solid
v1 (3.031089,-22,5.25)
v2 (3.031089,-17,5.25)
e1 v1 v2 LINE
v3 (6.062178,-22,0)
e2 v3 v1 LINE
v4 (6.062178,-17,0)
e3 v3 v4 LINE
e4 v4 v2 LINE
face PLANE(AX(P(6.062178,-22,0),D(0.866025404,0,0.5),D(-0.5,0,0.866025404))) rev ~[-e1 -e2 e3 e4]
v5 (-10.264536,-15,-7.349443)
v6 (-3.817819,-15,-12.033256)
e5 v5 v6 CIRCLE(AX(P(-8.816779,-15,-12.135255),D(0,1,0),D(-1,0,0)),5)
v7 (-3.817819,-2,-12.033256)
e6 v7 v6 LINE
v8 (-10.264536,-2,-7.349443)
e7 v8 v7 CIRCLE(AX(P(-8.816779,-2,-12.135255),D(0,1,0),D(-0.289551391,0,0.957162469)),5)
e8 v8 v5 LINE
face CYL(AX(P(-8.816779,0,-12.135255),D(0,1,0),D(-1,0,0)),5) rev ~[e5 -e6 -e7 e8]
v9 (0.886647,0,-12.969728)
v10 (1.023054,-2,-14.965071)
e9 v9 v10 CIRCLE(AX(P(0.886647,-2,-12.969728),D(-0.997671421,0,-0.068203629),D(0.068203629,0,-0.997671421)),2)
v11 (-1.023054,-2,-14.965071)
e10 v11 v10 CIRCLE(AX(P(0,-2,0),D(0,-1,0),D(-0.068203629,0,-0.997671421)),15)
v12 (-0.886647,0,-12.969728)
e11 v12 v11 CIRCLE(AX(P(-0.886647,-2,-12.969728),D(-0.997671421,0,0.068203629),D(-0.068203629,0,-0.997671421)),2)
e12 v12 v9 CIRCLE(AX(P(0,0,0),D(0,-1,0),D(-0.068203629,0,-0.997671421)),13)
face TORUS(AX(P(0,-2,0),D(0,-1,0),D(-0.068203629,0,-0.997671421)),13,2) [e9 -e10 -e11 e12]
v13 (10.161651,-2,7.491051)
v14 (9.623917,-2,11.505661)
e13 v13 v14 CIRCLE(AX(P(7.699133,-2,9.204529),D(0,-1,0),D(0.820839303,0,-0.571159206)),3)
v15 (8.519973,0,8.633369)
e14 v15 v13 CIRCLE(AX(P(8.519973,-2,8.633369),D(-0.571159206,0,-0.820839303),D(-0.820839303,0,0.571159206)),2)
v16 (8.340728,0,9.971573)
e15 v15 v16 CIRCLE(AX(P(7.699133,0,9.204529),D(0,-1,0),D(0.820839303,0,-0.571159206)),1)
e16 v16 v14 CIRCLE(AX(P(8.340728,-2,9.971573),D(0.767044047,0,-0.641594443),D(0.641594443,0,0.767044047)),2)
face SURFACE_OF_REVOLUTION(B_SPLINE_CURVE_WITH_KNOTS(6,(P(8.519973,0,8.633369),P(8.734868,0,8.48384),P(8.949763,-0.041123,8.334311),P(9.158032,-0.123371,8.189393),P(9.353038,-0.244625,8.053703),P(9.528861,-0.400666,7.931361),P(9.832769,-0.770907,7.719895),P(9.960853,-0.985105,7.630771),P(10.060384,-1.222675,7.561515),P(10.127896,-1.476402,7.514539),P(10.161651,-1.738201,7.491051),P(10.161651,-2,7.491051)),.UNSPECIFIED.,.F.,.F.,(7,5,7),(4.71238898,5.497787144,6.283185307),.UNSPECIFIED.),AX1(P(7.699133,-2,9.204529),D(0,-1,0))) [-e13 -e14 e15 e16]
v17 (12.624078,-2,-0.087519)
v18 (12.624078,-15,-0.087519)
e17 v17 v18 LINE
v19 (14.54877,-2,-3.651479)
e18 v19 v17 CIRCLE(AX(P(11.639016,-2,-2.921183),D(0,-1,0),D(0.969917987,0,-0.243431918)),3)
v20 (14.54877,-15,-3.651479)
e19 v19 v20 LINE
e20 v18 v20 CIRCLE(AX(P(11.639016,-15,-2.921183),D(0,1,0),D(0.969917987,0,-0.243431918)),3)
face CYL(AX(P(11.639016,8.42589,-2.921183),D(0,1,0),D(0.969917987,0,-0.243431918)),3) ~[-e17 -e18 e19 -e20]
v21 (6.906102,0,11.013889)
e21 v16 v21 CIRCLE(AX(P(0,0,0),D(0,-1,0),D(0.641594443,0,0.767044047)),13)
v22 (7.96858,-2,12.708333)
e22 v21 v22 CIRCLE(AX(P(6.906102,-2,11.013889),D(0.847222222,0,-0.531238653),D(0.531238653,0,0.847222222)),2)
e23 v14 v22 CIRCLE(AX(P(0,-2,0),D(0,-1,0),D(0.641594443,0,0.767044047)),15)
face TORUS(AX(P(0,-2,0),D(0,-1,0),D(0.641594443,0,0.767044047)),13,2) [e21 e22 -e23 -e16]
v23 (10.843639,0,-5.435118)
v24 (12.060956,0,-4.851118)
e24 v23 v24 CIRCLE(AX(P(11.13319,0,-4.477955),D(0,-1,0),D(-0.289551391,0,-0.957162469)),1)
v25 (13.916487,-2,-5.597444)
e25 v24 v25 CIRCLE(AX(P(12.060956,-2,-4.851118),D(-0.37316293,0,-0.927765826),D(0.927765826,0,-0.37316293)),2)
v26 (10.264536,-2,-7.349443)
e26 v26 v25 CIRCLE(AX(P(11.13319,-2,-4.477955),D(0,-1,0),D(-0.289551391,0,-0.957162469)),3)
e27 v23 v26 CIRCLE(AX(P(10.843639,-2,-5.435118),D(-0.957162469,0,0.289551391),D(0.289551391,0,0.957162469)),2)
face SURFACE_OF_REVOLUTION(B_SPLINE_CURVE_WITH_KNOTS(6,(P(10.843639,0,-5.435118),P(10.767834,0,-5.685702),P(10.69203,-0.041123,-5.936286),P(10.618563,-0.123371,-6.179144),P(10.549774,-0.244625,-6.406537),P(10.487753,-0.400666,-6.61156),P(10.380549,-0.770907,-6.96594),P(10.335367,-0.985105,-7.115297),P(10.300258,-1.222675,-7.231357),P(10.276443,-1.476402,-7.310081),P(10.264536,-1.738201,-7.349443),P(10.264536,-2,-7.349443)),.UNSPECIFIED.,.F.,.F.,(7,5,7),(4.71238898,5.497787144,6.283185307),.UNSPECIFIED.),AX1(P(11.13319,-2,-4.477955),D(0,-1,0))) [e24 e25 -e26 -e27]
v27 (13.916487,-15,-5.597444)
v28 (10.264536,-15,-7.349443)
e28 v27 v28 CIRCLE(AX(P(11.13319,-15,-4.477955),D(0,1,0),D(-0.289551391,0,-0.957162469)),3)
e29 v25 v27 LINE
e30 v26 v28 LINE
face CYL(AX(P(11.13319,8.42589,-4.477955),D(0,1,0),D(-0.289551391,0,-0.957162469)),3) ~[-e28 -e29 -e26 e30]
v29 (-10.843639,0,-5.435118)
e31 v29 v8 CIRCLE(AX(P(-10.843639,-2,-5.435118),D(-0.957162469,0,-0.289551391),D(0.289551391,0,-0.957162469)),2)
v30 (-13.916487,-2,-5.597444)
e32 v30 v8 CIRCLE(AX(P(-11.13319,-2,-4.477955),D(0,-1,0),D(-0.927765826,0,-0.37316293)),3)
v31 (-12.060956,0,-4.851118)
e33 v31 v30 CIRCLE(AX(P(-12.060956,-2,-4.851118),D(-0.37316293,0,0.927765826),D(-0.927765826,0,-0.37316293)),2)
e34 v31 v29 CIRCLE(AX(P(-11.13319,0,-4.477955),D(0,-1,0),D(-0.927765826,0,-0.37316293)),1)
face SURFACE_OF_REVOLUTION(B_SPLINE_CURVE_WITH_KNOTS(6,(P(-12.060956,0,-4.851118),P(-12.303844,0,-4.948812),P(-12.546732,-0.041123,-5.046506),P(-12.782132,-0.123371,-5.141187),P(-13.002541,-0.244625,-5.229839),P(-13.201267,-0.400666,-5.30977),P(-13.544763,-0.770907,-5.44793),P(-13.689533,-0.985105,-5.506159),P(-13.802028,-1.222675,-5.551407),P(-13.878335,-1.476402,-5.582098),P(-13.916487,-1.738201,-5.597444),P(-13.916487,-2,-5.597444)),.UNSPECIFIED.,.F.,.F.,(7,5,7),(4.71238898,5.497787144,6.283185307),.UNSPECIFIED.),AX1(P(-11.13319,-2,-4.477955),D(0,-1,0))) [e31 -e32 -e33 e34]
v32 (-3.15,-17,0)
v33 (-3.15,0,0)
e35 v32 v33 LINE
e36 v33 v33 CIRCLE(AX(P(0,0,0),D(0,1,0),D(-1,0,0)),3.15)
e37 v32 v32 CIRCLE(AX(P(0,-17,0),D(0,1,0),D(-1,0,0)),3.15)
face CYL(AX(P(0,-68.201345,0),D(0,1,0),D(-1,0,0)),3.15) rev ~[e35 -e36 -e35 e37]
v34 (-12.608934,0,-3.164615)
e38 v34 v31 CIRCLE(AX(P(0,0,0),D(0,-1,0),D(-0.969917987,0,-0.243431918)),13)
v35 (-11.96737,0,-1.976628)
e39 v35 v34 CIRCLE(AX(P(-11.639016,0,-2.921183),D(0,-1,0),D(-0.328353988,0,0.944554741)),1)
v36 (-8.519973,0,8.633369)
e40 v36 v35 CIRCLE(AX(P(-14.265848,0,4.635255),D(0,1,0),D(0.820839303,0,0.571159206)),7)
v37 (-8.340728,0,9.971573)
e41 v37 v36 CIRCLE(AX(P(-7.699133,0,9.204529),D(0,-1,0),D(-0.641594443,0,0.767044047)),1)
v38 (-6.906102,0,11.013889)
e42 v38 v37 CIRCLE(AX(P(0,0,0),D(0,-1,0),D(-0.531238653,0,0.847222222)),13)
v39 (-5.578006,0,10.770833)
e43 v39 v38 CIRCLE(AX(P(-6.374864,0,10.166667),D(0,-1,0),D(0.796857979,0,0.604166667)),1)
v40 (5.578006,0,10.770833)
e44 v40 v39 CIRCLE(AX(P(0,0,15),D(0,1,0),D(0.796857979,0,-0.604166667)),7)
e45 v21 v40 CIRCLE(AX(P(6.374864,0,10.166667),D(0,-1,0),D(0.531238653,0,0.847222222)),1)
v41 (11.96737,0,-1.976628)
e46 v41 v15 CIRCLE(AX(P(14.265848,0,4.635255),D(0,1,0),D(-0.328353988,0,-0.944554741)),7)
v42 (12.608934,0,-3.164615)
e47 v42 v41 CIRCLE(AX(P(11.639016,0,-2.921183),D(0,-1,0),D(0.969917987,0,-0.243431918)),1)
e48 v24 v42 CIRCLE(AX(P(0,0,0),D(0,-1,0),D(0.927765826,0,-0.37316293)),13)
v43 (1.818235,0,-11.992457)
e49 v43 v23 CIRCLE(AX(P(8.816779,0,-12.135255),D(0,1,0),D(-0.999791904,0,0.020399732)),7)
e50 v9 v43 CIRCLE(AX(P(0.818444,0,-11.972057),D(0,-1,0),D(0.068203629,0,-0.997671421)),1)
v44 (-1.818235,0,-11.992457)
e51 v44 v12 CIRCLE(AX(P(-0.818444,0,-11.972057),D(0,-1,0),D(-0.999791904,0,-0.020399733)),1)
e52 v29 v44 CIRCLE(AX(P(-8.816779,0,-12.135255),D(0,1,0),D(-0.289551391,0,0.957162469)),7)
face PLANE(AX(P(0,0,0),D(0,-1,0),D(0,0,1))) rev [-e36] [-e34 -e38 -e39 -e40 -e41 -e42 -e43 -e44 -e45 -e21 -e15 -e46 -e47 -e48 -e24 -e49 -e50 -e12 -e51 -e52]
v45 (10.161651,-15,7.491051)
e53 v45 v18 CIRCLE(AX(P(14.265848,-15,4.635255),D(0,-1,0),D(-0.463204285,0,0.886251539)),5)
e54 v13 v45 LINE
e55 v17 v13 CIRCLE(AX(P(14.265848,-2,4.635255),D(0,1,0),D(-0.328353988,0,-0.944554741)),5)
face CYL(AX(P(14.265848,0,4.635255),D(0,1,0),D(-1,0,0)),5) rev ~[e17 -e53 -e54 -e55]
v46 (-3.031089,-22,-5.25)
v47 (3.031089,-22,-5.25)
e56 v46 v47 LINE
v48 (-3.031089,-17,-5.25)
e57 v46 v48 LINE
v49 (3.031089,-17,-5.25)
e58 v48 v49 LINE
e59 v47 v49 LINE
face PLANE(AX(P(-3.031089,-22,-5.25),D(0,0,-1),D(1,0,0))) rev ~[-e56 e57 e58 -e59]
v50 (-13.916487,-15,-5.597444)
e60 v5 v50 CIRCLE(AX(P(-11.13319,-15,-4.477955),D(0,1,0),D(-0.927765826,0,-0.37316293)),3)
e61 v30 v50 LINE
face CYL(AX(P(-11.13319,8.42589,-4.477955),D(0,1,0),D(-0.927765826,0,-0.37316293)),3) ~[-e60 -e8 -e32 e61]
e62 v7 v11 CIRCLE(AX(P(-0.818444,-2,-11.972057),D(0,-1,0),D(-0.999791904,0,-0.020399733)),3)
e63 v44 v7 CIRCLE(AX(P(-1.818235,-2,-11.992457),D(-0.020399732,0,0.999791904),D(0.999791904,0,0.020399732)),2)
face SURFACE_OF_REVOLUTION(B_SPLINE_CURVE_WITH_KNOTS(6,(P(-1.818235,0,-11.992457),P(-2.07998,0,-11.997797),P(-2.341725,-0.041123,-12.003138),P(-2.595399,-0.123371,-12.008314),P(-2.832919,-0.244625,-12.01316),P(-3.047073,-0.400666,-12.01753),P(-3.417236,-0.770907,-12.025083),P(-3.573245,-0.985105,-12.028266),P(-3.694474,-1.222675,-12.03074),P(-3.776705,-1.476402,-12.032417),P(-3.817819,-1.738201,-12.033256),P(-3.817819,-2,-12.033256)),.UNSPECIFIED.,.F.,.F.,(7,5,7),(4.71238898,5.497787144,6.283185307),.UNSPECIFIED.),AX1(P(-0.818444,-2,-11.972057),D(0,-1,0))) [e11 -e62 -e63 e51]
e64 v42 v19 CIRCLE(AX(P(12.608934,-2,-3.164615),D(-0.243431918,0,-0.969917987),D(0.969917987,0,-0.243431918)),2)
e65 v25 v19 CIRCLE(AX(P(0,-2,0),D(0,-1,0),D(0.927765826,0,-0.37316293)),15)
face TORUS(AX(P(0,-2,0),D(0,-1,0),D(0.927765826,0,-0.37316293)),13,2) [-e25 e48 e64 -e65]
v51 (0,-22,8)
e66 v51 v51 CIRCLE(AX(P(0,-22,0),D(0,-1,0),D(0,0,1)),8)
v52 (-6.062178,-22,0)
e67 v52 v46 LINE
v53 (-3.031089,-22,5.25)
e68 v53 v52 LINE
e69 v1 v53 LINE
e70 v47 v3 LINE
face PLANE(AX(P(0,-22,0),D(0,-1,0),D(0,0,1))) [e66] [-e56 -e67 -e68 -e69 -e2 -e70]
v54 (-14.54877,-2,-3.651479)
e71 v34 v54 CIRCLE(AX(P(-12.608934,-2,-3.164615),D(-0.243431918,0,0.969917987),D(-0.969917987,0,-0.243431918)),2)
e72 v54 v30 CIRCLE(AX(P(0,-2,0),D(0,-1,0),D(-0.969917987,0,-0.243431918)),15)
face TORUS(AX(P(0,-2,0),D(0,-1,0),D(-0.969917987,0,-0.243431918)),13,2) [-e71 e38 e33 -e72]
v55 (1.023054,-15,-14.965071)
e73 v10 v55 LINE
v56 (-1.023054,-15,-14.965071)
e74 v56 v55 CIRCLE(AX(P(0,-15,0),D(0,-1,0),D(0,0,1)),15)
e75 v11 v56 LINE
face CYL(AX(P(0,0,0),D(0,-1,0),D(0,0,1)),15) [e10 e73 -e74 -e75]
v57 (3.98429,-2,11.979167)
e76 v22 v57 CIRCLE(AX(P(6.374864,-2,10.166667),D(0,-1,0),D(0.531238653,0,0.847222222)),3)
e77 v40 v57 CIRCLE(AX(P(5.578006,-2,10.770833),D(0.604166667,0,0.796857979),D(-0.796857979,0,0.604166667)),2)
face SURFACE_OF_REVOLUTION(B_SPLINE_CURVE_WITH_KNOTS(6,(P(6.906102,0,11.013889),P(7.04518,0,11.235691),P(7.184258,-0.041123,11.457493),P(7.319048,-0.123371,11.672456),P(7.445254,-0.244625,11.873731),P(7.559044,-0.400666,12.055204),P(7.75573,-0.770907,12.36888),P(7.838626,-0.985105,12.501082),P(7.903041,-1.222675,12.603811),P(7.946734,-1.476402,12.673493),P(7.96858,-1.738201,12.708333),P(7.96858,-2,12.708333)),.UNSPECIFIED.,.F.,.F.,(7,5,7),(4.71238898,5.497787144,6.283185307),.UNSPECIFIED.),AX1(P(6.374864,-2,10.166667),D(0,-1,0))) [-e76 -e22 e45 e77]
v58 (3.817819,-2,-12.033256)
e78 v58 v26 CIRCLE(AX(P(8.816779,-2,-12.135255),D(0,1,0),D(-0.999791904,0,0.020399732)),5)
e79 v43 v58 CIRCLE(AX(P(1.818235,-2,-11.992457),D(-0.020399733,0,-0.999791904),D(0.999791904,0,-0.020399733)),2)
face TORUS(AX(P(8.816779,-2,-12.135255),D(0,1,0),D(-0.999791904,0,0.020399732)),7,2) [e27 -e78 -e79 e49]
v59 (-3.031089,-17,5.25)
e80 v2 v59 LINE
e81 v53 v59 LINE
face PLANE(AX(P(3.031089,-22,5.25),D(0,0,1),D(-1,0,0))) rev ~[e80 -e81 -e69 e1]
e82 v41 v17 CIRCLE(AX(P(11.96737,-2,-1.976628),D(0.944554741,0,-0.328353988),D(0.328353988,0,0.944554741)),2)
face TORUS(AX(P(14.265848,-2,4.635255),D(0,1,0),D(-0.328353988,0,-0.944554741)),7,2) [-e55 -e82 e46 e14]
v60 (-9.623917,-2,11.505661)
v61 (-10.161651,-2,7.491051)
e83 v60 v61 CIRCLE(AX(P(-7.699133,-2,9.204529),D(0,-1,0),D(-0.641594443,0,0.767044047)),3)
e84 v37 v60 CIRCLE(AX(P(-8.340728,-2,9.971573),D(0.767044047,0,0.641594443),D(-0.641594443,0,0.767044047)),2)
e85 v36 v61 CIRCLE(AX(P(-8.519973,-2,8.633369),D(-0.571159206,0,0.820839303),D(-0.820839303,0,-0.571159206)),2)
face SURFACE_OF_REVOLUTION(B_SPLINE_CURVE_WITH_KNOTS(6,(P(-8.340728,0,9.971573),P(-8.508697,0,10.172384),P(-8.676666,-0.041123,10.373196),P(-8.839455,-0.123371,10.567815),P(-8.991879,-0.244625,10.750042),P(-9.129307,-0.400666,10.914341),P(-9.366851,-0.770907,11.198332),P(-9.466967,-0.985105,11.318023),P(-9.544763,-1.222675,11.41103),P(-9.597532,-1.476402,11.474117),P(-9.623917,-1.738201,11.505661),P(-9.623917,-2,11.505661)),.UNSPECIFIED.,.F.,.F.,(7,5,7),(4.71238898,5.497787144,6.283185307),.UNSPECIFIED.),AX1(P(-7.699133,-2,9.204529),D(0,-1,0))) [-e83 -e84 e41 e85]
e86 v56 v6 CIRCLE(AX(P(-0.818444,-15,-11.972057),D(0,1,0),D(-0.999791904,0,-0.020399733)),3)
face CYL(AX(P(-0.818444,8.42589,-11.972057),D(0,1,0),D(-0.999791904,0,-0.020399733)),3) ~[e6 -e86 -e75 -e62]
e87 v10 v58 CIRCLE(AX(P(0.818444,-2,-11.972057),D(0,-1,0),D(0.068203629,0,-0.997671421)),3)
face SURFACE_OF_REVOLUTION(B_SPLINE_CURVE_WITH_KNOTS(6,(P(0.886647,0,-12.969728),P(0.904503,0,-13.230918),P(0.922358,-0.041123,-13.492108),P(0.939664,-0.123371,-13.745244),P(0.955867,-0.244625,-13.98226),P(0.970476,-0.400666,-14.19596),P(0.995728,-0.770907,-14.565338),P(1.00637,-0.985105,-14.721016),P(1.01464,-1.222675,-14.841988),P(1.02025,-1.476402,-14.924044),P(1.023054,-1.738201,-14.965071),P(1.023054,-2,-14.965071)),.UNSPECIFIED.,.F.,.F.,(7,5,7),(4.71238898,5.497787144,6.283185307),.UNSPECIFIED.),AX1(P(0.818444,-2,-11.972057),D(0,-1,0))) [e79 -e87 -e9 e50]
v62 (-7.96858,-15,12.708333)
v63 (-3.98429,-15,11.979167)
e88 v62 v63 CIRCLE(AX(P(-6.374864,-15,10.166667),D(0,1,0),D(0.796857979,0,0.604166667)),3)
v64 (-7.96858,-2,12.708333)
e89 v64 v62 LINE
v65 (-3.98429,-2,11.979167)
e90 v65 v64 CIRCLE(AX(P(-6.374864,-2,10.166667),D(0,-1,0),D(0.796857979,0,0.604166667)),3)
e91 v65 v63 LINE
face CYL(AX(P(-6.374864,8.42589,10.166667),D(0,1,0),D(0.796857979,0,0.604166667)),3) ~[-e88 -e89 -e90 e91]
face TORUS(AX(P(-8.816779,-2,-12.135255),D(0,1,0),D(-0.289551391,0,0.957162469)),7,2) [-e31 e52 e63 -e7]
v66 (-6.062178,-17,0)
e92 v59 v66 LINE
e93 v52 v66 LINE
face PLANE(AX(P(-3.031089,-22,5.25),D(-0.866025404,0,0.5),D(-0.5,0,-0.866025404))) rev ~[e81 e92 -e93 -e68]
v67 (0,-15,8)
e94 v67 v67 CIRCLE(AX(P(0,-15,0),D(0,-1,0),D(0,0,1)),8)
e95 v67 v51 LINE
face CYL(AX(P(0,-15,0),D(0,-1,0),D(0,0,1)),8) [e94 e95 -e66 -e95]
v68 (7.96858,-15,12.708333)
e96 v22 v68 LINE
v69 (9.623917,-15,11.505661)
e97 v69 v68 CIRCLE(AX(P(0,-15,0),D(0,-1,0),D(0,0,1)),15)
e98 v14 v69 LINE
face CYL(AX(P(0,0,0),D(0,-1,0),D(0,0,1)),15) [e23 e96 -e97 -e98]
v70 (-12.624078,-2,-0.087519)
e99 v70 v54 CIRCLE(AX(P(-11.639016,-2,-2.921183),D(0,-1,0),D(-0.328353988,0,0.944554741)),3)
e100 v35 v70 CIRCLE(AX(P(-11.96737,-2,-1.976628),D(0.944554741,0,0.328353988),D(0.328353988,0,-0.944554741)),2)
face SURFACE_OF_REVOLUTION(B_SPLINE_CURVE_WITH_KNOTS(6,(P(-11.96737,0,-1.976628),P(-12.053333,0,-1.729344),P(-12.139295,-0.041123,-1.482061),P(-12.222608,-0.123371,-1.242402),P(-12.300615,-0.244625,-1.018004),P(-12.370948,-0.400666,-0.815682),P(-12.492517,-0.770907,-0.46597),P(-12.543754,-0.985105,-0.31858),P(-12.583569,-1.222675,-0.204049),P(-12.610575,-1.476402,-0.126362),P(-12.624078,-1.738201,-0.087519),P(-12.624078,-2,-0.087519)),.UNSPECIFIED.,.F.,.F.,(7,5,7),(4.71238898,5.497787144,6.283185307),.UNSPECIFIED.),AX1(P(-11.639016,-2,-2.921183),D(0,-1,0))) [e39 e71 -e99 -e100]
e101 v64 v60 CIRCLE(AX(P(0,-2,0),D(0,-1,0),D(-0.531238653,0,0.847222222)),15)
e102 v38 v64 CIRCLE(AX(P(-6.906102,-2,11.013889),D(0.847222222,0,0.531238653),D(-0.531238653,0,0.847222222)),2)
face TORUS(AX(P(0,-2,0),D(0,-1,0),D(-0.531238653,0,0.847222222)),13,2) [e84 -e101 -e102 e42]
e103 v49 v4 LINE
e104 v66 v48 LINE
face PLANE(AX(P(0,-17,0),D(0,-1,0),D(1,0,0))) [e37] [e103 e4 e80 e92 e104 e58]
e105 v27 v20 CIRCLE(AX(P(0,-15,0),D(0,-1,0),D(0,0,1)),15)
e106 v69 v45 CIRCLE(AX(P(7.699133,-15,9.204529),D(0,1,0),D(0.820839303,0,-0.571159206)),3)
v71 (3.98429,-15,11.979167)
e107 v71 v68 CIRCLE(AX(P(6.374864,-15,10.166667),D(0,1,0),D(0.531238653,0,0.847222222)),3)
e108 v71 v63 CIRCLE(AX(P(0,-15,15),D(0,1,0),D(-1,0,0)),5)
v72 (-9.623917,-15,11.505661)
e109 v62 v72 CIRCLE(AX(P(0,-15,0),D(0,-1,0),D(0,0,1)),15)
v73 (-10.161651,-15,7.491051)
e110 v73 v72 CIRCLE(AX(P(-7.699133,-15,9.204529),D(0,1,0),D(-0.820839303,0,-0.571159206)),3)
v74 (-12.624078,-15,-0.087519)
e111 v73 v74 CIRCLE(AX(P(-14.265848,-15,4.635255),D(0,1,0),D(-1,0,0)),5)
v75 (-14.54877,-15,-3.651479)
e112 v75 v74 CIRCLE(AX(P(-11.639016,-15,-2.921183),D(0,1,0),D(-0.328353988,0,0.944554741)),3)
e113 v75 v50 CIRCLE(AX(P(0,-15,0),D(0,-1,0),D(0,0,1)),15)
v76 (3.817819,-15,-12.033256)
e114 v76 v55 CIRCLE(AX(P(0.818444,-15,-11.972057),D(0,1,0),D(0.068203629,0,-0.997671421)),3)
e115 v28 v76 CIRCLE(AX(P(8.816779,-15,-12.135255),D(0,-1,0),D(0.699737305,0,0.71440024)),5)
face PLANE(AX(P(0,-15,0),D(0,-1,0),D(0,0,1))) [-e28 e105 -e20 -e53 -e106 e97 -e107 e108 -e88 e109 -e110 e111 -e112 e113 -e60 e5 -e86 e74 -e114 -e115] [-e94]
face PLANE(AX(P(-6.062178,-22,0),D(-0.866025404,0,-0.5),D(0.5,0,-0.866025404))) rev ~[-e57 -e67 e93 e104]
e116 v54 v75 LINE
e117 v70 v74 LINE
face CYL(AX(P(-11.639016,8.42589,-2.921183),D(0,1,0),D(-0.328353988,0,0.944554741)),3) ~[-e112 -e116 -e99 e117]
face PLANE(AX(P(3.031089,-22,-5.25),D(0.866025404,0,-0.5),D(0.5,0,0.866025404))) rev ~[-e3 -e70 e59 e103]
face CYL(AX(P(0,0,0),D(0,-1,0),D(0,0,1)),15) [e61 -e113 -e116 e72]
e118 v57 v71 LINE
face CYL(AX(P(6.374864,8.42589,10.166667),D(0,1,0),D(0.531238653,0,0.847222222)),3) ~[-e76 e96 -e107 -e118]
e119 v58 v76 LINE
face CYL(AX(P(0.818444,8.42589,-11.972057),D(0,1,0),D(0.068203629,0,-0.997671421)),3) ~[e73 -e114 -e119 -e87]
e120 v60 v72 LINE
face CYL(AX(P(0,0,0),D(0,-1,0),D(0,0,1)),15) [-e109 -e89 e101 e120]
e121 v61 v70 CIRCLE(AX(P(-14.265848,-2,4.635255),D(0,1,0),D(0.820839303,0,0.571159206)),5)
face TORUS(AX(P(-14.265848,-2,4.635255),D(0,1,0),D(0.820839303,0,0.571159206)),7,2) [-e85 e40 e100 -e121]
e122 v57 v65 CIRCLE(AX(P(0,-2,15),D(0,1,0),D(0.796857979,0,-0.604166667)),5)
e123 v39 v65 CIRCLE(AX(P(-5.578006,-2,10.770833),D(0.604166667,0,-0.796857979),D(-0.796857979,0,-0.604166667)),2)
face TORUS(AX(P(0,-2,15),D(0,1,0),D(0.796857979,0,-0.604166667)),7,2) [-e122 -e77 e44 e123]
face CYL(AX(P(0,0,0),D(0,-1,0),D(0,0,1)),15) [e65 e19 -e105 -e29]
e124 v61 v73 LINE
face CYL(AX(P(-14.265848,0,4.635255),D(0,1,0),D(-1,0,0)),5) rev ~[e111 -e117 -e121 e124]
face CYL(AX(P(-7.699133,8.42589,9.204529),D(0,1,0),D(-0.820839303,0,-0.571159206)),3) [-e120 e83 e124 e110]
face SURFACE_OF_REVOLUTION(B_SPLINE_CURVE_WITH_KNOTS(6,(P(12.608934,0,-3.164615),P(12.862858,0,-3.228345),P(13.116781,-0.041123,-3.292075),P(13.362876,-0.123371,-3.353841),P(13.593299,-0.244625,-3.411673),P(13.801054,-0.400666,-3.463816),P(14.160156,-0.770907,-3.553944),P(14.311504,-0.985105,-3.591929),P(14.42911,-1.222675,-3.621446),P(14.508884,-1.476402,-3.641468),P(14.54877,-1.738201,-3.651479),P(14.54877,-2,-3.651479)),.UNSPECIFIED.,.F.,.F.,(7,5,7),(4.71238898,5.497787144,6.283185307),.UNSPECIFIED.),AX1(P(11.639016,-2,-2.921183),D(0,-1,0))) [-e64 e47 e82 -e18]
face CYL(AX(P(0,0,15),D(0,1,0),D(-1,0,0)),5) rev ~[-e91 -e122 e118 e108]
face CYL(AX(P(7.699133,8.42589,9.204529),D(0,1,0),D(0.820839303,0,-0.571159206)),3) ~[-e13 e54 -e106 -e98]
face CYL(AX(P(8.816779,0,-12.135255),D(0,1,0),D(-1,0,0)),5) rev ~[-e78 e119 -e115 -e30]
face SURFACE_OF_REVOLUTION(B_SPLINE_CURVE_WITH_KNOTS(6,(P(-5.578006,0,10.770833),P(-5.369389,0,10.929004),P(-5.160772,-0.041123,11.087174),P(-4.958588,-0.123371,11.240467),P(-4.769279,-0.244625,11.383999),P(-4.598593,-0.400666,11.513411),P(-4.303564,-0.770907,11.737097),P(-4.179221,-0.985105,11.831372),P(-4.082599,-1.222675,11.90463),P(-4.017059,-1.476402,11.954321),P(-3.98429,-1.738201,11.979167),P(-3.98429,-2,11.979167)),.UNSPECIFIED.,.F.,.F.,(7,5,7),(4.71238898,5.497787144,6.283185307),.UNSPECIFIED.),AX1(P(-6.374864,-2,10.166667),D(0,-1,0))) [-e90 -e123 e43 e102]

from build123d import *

# Parameters (mm, degrees)
F2_R        = 5
F3_DEPTH    = 15
F4_T1_DEPTH = 31.851779741
F6_DEPTH    = 5
F7_D        = 6.3
F8_R        = 2


# Not quite as in the source:
# - a fillet or chamfer that OpenCascade refuses, or shapes differently, is made with other operations: its cross-section is extruded or revolved along the edge and cut away or added


with BuildPart() as f1:
    # F0 (on Right) → F1 (revolve)
    with BuildSketch(Plane.YZ):
        Polygon((-22, 0), (0, 0), (0, 15), (-15, 15), (-15, 8), (-22, 8), align=None)
    revolve(axis=Axis((0, -11, 0), (0, -1, 0)))

    # F2 (on face) → F3 (cut)
    with BuildSketch(Plane(origin=(0, 0, 0), x_dir=(-1, 0, 0), z_dir=(0, 1, 0))):
        with Locations((0, 15)):
            Circle(F2_R)
        with Locations((-14.2658477444, 4.6352549156)):
            Circle(F2_R)
        with Locations((-8.8167787844, -12.1352549156)):
            Circle(F2_R)
        with Locations((8.8167787844, -12.1352549156)):
            Circle(F2_R)
        with Locations((14.2658477444, 4.6352549156)):
            Circle(F2_R)
    extrude(amount=-F3_DEPTH, mode=Mode.SUBTRACT)

    # F4: fillet of radius 3 on 10 edges, made by hand

    # F4_s2 → F4_t1 (cut)
    with BuildSketch(Plane.XZ.offset(-8.4258898705)):
        with BuildLine():
            ThreePointArc((14.5487698044, -3.6514787659), (14.2786844682, -1.4956481826), (12.6240778064, -0.0875187896))
            ThreePointArc((12.6240778064, -0.0875187896), (13.7969148622, -0.3427067106), (14.9967749751, -0.3110311036))
            ThreePointArc((14.9967749751, -0.3110311036), (14.8668911251, -1.993877698), (14.5487698044, -3.6514787659))
        make_face()
        with BuildLine():
            ThreePointArc((10.1616512299, 7.4910509465), (10.6725784478, 9.6028049498), (9.6239166514, 11.5056607062))
            ThreePointArc((9.6239166514, 11.5056607062), (10.855595668, 10.3516202931), (11.94982632, 9.0665126108))
            ThreePointArc((11.94982632, 9.0665126108), (10.9605006431, 8.3868786361), (10.1616512299, 7.4910509465))
        make_face()
        with BuildLine():
            ThreePointArc((1.0230544424, -14.9650713198), (2.9899102079, -14.0420166136), (3.8178192654, -12.0332562533))
            ThreePointArc((3.8178192654, -12.0332562533), (3.9375477121, -13.2275479821), (4.3384501703, -14.3588944602))
            ThreePointArc((4.3384501703, -14.3588944602), (2.6978316338, -14.755395775), (1.0230544424, -14.9650713198))
        make_face()
        with BuildLine():
            ThreePointArc((10.2645357375, -7.3494425703), (12.4308183364, -7.1827953553), (13.9164873867, -5.5974439539))
            ThreePointArc((13.9164873867, -5.5974439539), (13.1995394795, -7.1254584084), (12.3154653113, -8.5632537137))
            ThreePointArc((12.3154653113, -8.5632537137), (11.3633765438, -7.8323675302), (10.2645357375, -7.3494425703))
        make_face()
        with BuildLine():
            ThreePointArc((-13.9164873867, -5.5974439539), (-12.4308183364, -7.1827953553), (-10.2645357375, -7.3494425703))
            ThreePointArc((-10.2645357375, -7.3494425703), (-11.3633765438, -7.8323675302), (-12.3154653113, -8.5632537137))
            ThreePointArc((-12.3154653113, -8.5632537137), (-13.1995394795, -7.1254584084), (-13.9164873867, -5.5974439539))
        make_face()
        with BuildLine():
            ThreePointArc((-3.8178192654, -12.0332562533), (-2.9899102079, -14.0420166136), (-1.0230544424, -14.9650713198))
            ThreePointArc((-1.0230544424, -14.9650713198), (-2.6978316338, -14.755395775), (-4.3384501703, -14.3588944602))
            ThreePointArc((-4.3384501703, -14.3588944602), (-3.9375477121, -13.2275479821), (-3.8178192654, -12.0332562533))
        make_face()
        with BuildLine():
            ThreePointArc((-12.6240778064, -0.0875187896), (-14.2786844682, -1.4956481826), (-14.5487698044, -3.6514787659))
            ThreePointArc((-14.5487698044, -3.6514787659), (-14.8668911251, -1.993877698), (-14.9967749751, -0.3110311036))
            ThreePointArc((-14.9967749751, -0.3110311036), (-13.7969148622, -0.3427067106), (-12.6240778064, -0.0875187896))
        make_face()
        with BuildLine():
            ThreePointArc((-10.1616512299, 7.4910509465), (-10.6725784478, 9.6028049498), (-9.6239166514, 11.5056607062))
            ThreePointArc((-9.6239166514, 11.5056607062), (-10.855595668, 10.3516202931), (-11.94982632, 9.0665126108))
            ThreePointArc((-11.94982632, 9.0665126108), (-10.9605006431, 8.3868786361), (-10.1616512299, 7.4910509465))
        make_face()
        with BuildLine():
            ThreePointArc((7.9685797912, 12.7083333333), (5.8348021081, 13.1176552016), (3.9842898956, 11.9791666667))
            ThreePointArc((3.9842898956, 11.9791666667), (4.5894146126, 13.0157435868), (4.9300664859, 14.1666666667))
            ThreePointArc((4.9300664859, 14.1666666667), (6.4904123885, 13.5231115882), (7.9685797912, 12.7083333333))
        make_face()
        with BuildLine():
            ThreePointArc((-3.9842898956, 11.9791666667), (-5.8348021081, 13.1176552016), (-7.9685797912, 12.7083333333))
            ThreePointArc((-7.9685797912, 12.7083333333), (-6.4904123885, 13.5231115882), (-4.9300664859, 14.1666666667))
            ThreePointArc((-4.9300664859, 14.1666666667), (-4.5894146126, 13.0157435868), (-3.9842898956, 11.9791666667))
        make_face()
    extrude(amount=F4_T1_DEPTH, mode=Mode.SUBTRACT)

    # F5 (on face) → F6 (cut)
    with BuildSketch(Plane.XZ.offset(22)):
        Polygon((3.0310889132, 5.25), (-3.0310889132, 5.25), (-6.0621778265, 0), (-3.0310889132, -5.25), (3.0310889132, -5.25), (6.0621778265, 0), align=None)
    extrude(amount=-F6_DEPTH, mode=Mode.SUBTRACT)

    # F7 (through all)
    with Locations(Plane.XZ.offset(22)):
        with Locations((0, 0)):
            Hole(F7_D / 2)

    # F8
    f8_edges = [f1.edges().sort_by_distance(p)[0] for p in [
        (-8.816779, 0, 12.135255),
        (-5.834802, 0, 13.117655),
        (-10.672578, 0, 9.602805),
        (0, 0, 10),
        (-9.510565, 0, 3.09017),
        (5.834802, 0, 13.117655),
        (-14.278684, 0, -1.495648),
        (8.816779, 0, 12.135255),
        (-14.265848, 0, -4.635255),
        (10.672578, 0, 9.602805),
        (-12.430818, 0, -7.182795),
        (9.510565, 0, 3.09017),
        (-5.877853, 0, -8.09017),
        (14.278684, 0, -1.495648),
        (-2.98991, 0, -14.042017),
        (14.265848, 0, -4.635255),
        (0, 0, -15),
        (12.430818, 0, -7.182795),
        (2.98991, 0, -14.042017),
        (5.877853, 0, -8.09017),
    ]]
    fillet(f8_edges, radius=F8_R)


solid = f1.part
